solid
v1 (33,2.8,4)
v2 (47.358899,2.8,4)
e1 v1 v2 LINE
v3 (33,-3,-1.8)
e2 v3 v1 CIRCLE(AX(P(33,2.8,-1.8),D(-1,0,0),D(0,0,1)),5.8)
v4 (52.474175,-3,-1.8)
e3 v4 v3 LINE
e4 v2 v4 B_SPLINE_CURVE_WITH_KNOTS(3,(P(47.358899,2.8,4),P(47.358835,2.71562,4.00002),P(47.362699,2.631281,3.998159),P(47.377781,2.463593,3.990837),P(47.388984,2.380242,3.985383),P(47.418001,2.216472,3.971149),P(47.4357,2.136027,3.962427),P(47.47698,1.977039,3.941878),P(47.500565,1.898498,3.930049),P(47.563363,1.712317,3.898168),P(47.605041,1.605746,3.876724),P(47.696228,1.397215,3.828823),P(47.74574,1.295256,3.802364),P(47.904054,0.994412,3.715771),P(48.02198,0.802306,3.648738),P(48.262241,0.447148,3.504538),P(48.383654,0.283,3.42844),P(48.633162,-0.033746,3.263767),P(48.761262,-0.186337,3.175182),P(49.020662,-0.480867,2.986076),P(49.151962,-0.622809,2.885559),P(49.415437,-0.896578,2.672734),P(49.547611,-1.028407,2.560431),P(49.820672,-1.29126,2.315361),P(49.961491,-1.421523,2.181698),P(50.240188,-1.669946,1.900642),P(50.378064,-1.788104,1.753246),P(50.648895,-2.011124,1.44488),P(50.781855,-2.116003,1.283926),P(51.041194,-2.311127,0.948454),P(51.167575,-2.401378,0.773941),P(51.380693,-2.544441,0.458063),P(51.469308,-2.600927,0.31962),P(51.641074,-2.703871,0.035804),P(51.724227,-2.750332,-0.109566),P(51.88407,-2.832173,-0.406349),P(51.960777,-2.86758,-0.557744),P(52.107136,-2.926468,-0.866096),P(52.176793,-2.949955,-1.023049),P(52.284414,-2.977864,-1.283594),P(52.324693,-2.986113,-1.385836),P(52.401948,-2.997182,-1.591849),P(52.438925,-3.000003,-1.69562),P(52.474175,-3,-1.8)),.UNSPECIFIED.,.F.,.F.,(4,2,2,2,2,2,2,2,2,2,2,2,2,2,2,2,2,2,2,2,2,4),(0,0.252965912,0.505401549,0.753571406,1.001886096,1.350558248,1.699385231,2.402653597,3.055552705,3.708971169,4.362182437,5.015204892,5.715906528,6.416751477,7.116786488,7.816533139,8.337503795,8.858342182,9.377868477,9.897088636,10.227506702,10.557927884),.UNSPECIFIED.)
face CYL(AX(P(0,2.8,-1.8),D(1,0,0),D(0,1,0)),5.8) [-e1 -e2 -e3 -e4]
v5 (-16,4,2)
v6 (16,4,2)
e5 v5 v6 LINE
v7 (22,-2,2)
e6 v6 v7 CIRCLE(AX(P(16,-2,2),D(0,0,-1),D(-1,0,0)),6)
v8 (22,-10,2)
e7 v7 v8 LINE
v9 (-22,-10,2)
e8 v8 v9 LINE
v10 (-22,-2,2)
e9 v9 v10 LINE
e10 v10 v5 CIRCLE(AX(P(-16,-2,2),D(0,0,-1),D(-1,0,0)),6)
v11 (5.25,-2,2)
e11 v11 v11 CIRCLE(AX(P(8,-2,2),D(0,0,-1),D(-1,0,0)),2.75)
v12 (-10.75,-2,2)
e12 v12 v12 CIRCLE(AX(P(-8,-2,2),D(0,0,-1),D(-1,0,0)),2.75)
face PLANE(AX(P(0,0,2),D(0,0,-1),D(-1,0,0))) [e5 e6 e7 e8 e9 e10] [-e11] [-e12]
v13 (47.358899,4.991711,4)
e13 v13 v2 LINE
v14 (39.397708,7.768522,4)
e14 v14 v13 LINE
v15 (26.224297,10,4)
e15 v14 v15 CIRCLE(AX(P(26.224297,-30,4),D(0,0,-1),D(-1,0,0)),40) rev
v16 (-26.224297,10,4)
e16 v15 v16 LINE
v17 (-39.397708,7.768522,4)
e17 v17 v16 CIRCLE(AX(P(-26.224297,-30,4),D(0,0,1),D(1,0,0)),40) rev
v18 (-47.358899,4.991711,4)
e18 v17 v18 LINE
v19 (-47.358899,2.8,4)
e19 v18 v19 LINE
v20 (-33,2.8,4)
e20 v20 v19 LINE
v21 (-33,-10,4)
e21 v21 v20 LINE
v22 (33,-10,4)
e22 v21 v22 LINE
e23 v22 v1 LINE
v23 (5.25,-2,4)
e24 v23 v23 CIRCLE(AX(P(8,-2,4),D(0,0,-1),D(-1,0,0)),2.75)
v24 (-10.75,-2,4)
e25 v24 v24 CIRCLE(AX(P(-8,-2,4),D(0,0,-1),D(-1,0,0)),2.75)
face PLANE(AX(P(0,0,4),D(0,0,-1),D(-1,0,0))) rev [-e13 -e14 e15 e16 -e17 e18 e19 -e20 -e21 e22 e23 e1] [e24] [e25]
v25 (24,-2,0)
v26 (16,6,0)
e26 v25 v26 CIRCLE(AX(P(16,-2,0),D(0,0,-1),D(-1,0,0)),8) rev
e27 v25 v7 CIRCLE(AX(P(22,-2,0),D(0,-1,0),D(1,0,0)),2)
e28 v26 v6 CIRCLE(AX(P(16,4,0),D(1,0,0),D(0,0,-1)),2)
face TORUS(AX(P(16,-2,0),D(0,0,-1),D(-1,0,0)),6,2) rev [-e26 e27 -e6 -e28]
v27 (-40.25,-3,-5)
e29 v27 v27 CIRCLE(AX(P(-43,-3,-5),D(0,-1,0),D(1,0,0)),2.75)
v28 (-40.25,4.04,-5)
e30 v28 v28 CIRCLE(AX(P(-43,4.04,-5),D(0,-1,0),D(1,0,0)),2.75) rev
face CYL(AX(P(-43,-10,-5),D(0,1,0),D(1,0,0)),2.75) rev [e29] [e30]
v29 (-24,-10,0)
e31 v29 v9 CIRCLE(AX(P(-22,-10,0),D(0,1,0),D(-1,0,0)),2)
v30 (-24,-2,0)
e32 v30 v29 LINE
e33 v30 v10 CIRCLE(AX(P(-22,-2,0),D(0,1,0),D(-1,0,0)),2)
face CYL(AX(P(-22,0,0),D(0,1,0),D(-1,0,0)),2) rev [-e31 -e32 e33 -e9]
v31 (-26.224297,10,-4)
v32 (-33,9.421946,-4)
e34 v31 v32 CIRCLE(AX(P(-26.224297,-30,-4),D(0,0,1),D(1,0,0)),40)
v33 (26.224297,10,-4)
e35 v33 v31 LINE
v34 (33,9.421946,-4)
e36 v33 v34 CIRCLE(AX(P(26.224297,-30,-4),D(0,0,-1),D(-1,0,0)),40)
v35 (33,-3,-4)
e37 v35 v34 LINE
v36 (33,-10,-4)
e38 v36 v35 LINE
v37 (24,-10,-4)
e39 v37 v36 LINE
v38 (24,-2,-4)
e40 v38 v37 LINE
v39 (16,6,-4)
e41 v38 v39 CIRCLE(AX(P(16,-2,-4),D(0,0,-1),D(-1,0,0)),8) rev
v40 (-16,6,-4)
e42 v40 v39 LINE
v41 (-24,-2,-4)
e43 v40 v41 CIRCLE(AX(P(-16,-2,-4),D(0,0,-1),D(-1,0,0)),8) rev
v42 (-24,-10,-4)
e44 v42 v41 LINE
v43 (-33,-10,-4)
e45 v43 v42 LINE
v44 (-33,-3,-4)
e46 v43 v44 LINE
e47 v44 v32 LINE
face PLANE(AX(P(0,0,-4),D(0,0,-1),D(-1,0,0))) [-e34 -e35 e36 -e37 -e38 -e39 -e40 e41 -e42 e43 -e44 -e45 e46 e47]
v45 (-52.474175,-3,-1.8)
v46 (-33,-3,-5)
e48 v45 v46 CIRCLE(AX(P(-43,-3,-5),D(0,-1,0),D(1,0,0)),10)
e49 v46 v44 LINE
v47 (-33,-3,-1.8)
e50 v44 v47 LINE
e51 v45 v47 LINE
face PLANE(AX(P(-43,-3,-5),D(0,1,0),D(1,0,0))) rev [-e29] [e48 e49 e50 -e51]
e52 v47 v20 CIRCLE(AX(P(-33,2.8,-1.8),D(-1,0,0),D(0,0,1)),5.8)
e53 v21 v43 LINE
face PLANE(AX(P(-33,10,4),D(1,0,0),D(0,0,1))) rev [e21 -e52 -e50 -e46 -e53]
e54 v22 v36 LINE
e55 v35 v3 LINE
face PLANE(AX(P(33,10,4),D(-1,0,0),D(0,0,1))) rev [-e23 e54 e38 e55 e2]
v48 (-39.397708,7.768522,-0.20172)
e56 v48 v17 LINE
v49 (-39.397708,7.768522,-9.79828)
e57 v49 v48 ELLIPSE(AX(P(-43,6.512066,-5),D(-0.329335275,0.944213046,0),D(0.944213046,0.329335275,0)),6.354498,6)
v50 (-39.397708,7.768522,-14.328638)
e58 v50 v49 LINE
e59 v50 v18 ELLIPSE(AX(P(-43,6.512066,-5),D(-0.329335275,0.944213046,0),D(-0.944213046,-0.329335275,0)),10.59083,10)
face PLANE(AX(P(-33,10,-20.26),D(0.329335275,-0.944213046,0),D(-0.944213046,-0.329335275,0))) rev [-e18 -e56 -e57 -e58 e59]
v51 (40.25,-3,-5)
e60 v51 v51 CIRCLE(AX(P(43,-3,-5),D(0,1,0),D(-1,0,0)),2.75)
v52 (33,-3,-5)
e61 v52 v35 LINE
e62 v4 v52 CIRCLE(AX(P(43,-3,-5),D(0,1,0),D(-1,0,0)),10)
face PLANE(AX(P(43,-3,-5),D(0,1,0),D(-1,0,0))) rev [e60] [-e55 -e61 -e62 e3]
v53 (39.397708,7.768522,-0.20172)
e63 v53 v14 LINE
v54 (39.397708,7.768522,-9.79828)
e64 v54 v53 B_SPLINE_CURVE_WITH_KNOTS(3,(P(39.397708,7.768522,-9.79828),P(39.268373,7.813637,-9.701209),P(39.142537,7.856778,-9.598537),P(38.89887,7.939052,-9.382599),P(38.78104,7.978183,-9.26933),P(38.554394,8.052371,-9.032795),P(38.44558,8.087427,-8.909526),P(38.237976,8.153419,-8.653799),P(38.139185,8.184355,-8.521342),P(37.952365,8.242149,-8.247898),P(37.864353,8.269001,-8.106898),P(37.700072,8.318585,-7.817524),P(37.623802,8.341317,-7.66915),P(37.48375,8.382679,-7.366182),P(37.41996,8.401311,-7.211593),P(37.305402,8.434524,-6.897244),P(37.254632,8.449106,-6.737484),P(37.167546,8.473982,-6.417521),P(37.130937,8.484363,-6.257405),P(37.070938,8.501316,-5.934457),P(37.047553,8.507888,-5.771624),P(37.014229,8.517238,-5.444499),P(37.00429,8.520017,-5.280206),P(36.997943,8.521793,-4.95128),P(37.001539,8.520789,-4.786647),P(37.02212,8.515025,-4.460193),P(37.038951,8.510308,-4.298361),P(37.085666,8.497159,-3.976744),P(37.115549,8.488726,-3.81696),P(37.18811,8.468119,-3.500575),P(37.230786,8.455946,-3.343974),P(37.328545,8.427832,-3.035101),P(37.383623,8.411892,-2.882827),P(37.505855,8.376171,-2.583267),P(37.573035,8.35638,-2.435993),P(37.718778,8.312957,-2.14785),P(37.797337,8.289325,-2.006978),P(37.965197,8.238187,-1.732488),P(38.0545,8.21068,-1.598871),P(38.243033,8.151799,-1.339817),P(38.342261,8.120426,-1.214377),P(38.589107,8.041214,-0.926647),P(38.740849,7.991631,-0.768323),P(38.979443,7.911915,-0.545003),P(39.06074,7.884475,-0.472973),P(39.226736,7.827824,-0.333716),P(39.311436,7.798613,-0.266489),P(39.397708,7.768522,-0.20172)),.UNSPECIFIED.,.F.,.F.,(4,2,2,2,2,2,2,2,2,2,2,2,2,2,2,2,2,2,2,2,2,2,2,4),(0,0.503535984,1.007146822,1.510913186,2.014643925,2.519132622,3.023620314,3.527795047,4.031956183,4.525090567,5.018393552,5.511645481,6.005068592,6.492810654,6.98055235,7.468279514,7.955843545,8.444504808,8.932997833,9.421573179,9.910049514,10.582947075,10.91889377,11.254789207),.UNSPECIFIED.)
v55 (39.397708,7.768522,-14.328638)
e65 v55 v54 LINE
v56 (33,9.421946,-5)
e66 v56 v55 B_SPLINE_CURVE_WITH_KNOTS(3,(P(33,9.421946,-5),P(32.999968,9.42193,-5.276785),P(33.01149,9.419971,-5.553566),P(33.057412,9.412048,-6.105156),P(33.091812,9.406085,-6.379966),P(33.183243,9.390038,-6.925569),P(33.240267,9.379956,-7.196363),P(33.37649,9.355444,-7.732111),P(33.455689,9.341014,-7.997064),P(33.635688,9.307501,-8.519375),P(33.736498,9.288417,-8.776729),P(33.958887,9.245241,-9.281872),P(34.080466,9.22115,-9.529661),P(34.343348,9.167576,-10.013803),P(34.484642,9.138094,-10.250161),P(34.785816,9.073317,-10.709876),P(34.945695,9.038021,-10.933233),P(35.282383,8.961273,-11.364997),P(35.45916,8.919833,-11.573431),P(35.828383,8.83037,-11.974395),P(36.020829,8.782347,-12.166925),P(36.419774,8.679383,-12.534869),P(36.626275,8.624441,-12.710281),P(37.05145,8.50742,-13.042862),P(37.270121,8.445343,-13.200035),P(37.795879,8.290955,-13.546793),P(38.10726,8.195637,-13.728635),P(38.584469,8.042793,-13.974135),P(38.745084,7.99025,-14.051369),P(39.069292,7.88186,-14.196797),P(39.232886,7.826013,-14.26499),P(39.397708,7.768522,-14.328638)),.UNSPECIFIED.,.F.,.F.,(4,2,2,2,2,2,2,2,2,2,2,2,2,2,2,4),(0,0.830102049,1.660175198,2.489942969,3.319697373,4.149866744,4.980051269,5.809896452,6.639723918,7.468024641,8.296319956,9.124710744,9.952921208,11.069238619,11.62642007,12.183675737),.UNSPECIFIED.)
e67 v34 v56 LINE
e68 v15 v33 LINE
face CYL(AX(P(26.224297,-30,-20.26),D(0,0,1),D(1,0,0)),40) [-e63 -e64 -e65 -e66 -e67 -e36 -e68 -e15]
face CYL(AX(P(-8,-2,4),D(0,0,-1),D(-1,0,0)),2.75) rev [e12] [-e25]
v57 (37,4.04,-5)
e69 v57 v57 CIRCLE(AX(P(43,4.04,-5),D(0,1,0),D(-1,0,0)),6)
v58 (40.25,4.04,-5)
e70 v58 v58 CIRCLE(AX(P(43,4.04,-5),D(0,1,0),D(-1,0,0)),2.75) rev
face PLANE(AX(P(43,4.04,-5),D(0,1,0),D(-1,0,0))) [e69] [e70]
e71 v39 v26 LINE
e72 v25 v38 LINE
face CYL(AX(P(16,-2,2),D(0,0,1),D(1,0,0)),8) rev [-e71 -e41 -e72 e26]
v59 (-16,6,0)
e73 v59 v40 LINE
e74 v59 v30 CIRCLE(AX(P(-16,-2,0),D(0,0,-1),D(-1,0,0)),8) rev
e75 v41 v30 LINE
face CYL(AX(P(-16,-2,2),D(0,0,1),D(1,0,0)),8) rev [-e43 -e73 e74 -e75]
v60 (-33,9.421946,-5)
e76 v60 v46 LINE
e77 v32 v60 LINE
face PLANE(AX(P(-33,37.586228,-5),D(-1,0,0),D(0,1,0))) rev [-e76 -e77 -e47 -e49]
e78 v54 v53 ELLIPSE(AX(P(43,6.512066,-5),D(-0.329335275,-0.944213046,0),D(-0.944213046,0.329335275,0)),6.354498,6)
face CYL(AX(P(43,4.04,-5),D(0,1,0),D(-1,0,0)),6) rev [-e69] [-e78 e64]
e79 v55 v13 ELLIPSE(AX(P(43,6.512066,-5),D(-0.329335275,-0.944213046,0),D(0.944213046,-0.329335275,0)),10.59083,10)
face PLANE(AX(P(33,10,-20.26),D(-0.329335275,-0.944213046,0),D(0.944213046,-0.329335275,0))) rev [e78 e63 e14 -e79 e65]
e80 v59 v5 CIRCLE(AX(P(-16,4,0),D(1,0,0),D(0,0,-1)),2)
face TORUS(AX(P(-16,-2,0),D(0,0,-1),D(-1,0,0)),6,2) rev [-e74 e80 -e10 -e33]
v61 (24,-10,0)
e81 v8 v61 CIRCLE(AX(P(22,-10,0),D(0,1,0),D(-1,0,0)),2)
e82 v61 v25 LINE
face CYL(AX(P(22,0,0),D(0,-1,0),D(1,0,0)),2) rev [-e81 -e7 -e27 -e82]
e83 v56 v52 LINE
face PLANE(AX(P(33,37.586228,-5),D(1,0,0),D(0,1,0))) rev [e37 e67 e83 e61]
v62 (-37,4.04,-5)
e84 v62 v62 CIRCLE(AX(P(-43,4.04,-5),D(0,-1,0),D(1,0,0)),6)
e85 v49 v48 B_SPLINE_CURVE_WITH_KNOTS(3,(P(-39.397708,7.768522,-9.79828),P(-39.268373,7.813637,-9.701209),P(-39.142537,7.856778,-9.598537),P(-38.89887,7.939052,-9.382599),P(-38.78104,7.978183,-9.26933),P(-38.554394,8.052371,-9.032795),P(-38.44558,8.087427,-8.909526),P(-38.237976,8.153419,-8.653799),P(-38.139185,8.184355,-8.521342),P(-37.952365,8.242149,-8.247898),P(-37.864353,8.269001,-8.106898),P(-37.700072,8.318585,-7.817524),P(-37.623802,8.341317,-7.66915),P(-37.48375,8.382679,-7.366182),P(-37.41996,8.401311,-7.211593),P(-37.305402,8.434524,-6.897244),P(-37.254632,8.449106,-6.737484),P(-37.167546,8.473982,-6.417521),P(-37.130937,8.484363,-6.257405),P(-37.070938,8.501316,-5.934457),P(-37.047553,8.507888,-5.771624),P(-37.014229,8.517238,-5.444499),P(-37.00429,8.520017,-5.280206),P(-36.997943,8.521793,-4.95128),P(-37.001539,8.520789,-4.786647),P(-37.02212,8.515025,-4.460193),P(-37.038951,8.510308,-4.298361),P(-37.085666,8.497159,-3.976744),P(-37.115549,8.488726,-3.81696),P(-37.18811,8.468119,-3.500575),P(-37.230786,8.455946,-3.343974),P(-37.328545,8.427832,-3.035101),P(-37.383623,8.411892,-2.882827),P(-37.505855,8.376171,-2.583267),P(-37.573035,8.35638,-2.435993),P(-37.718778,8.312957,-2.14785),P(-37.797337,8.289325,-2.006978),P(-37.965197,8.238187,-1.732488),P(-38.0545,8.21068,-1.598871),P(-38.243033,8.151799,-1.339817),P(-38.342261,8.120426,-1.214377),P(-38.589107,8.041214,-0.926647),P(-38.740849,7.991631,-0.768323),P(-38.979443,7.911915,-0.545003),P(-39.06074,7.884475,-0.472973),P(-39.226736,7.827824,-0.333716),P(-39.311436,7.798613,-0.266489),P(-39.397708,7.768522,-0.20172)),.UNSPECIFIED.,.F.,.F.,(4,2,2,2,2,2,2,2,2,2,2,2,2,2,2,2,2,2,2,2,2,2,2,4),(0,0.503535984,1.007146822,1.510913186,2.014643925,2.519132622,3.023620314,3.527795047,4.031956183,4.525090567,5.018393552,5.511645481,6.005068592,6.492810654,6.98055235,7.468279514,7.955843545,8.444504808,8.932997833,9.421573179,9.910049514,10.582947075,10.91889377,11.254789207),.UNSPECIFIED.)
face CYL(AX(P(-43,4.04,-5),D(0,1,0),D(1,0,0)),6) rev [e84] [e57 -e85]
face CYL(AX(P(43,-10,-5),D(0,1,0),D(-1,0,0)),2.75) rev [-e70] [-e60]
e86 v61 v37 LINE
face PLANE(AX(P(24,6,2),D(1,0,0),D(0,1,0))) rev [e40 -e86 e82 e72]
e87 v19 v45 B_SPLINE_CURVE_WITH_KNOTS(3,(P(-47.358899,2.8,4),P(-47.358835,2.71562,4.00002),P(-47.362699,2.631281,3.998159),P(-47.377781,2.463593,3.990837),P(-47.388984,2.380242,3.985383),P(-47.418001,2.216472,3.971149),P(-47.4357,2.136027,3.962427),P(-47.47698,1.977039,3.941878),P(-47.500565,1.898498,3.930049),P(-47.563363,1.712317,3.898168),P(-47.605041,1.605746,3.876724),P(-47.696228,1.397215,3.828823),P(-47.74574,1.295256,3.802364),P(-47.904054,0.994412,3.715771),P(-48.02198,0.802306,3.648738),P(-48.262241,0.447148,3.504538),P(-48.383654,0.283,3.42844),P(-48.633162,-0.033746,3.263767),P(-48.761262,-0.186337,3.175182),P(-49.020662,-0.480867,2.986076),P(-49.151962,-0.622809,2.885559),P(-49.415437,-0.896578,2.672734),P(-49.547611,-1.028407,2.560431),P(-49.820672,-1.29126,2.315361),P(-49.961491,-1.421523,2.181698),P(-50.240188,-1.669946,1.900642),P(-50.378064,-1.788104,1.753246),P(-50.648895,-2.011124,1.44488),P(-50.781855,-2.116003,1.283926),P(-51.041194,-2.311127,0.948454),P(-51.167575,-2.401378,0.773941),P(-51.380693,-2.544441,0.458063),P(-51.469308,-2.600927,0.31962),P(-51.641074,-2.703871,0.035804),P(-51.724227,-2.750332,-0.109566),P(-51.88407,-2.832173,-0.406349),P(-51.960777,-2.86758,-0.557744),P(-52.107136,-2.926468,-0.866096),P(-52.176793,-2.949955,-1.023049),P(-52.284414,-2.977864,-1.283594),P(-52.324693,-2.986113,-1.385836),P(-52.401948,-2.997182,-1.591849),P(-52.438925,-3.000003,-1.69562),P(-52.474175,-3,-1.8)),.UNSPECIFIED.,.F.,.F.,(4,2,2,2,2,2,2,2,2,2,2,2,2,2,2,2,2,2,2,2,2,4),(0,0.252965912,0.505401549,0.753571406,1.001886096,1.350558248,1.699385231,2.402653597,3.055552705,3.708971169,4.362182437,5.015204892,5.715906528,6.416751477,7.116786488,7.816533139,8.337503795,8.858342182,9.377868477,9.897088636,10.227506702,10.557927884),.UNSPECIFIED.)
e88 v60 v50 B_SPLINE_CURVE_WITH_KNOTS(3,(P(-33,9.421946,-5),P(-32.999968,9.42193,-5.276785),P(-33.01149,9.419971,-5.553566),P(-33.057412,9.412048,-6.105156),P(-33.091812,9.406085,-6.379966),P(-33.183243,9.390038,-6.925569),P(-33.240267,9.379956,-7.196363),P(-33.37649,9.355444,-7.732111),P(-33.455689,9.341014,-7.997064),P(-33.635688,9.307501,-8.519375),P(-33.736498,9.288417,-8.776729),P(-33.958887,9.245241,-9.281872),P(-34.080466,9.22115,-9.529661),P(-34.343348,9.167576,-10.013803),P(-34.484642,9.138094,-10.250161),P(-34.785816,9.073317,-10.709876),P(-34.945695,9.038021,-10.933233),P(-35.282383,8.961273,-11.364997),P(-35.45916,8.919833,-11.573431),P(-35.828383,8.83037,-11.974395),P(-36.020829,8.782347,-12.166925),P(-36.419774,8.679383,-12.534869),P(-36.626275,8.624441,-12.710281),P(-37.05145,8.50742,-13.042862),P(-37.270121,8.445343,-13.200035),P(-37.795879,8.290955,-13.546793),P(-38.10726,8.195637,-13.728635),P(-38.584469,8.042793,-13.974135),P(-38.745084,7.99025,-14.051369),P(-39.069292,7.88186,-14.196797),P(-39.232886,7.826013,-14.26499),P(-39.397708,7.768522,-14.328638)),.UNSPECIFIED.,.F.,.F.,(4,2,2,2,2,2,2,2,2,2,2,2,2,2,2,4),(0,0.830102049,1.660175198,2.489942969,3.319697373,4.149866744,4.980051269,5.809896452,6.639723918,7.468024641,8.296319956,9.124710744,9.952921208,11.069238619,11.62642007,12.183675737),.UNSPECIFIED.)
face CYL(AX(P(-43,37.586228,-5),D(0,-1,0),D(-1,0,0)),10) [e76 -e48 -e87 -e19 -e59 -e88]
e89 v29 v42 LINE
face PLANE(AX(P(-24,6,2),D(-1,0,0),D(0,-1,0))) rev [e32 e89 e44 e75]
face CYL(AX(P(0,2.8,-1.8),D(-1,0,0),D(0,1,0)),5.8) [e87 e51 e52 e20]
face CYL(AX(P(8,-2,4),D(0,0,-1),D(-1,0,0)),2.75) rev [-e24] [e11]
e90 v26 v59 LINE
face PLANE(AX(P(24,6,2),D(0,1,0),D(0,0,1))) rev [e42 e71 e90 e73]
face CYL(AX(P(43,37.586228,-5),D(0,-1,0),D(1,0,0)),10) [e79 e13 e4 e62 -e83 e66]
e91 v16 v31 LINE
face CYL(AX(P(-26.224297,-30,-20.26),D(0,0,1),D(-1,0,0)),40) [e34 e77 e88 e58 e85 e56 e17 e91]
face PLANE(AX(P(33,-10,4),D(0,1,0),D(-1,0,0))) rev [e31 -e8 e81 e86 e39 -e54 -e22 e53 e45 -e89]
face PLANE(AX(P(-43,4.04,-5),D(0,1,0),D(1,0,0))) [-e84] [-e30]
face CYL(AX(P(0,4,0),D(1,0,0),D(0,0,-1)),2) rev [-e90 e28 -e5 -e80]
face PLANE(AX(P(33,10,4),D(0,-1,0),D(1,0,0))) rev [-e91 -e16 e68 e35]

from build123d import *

# Parameters (mm, degrees)
SKETCH1_W               = 33
SKETCH1_H               = 20
BOSS_EXTRUDE1_DEPTH     = 4
BOSS_EXTRUDE2_START     = -13
BOSS_EXTRUDE2_DEPTH     = 13
FILLET2_R               = 5.8
CUT_EXTRUDE1_DEPTH      = 59.600341412
CUT_EXTRUDE1_DEPTH_BACK = 59.600341412
SKETCH3_R               = 2.75
CUT_EXTRUDE2_DEPTH      = 24.26
FILLET3_R               = 40
SKETCH5_R               = 6
CUT_EXTRUDE3_DEPTH      = 5.96
SKETCH7_W               = 48
SKETCH7_H               = 16
CUT_EXTRUDE6_DEPTH      = 6
FILLET4_R               = 8
FILLET5_R               = 2
CUT_EXTRUDE7_DEPTH      = 57.550862204
CUT_EXTRUDE7_DEPTH_BACK = 57.550862204
SKETCH8_R               = 2.75


with BuildPart() as part:
    # Sketch1 → Boss-Extrude1 (new, symmetric)
    with BuildSketch(Plane.XY):
        with Locations((16.5, 0)):
            Rectangle(SKETCH1_W, SKETCH1_H)
    extrude(amount=BOSS_EXTRUDE1_DEPTH, both=True)

    # Sketch2 → Boss-Extrude2 (add)
    with BuildSketch(Plane(origin=(0, 10, 0), x_dir=(1, 0, 0), z_dir=(0, 1, 0)).offset(BOSS_EXTRUDE2_START)):
        with BuildLine():
            Line((33, 5), (33, -4))
            Line((33, -4), (47.358898944, -4))
            ThreePointArc((47.358898944, -4), (48.310885546, 13.473163206), (33, 5))
        make_face()
    extrude(amount=BOSS_EXTRUDE2_DEPTH)

    # Fillet2
    fillet2_edges = [part.edges().sort_by_distance(p)[0] for p in [
        (40.179449472, -3, 4),
    ]]
    fillet(fillet2_edges, radius=FILLET2_R)

    # Sketch3 → Cut-Extrude1 (cut, two sides: drawn at the far end of the back side and taken through both)
    with BuildSketch(Plane(origin=(0, 10, 0), x_dir=(1, 0, 0), z_dir=(0, 1, 0)).offset(-CUT_EXTRUDE1_DEPTH_BACK)):
        with Locations(Location((43, 5, 0), (0, 0, 180))):
            Circle(SKETCH3_R)
    extrude(amount=CUT_EXTRUDE1_DEPTH + CUT_EXTRUDE1_DEPTH_BACK, mode=Mode.SUBTRACT)

    # Sketch4 → Cut-Extrude2 (cut)
    with BuildSketch(Plane.XY.offset(4)):
        Polygon((33, 10), (53, 3.02413209), (53, 10), align=None)
    extrude(amount=-CUT_EXTRUDE2_DEPTH, mode=Mode.SUBTRACT)

    # Fillet3
    # the kernel refuses this fillet: 40 mm, written as the material it takes off along each edge
    with BuildSketch(Plane(origin=(33, 10, 20.939258542), x_dir=(0.9442130463798117, -0.32933527452454203, 0), z_dir=(0, 0, -1))) as fillet3_piece_1:
        with BuildLine():
            CenterArc((FILLET3_R * 0.169392585415, FILLET3_R), FILLET3_R, 250.771565663, 19.228434337)
            Line((-FILLET3_R * 0.159942689109, FILLET3_R * 0.0557869536202), (0, 0))
            Line((0, 0), (FILLET3_R * 0.169392585415, 0))
        make_face()
    extrude(amount=41.878517083, mode=Mode.SUBTRACT)

    # Sketch5 → Cut-Extrude3 (cut)
    with BuildSketch(Plane(origin=(0, 10, 0), x_dir=(1, 0, 0), z_dir=(0, 1, 0))):
        with Locations(Location((43, 5, 0), (0, 0, 180))):
            Circle(SKETCH5_R)
    extrude(amount=-CUT_EXTRUDE3_DEPTH, mode=Mode.SUBTRACT)

    # Mirror2: part across plane


with BuildPart() as part_1:
    add(part.part)
    add(part.part.mirror(Plane(origin=(0, 10, 4), x_dir=(0, 0, 1), z_dir=(1, 0, 0))))

    # Sketch7 → Cut-Extrude6 (cut)
    with BuildSketch(Plane(origin=(0, 0, -4), x_dir=(-1, 0, 0), z_dir=(0, 0, -1))):
        with Locations((0, -2)):
            Rectangle(SKETCH7_W, SKETCH7_H)
    extrude(amount=-CUT_EXTRUDE6_DEPTH, mode=Mode.SUBTRACT)

    # Fillet4
    fillet4_edges = [part_1.edges().sort_by_distance(p)[0] for p in [
        (-24, 6, -1),
        (24, 6, -1),
    ]]
    fillet(fillet4_edges, radius=FILLET4_R)

    # Fillet5
    fillet5_edges = [part_1.edges().sort_by_distance(p)[0] for p in [
        (-24, -6, 2),
        (0, 6, 2),
        (24, -6, 2),
        (21.656854249, 3.656854249, 2),
        (-21.656854249, 3.656854249, 2),
    ]]
    fillet(fillet5_edges, radius=FILLET5_R)

    # Sketch8 → Cut-Extrude7 (cut, two sides: drawn at the far end of the back side and taken through both)
    with BuildSketch(Plane(origin=(0, 0, 2), x_dir=(-1, 0, 0), z_dir=(0, 0, -1)).offset(-CUT_EXTRUDE7_DEPTH_BACK)):
        with Locations((-8, -2)):
            Circle(SKETCH8_R)
        with Locations((8, -2)):
            Circle(SKETCH8_R)
    extrude(amount=CUT_EXTRUDE7_DEPTH + CUT_EXTRUDE7_DEPTH_BACK, mode=Mode.SUBTRACT)


solid = part_1.part
